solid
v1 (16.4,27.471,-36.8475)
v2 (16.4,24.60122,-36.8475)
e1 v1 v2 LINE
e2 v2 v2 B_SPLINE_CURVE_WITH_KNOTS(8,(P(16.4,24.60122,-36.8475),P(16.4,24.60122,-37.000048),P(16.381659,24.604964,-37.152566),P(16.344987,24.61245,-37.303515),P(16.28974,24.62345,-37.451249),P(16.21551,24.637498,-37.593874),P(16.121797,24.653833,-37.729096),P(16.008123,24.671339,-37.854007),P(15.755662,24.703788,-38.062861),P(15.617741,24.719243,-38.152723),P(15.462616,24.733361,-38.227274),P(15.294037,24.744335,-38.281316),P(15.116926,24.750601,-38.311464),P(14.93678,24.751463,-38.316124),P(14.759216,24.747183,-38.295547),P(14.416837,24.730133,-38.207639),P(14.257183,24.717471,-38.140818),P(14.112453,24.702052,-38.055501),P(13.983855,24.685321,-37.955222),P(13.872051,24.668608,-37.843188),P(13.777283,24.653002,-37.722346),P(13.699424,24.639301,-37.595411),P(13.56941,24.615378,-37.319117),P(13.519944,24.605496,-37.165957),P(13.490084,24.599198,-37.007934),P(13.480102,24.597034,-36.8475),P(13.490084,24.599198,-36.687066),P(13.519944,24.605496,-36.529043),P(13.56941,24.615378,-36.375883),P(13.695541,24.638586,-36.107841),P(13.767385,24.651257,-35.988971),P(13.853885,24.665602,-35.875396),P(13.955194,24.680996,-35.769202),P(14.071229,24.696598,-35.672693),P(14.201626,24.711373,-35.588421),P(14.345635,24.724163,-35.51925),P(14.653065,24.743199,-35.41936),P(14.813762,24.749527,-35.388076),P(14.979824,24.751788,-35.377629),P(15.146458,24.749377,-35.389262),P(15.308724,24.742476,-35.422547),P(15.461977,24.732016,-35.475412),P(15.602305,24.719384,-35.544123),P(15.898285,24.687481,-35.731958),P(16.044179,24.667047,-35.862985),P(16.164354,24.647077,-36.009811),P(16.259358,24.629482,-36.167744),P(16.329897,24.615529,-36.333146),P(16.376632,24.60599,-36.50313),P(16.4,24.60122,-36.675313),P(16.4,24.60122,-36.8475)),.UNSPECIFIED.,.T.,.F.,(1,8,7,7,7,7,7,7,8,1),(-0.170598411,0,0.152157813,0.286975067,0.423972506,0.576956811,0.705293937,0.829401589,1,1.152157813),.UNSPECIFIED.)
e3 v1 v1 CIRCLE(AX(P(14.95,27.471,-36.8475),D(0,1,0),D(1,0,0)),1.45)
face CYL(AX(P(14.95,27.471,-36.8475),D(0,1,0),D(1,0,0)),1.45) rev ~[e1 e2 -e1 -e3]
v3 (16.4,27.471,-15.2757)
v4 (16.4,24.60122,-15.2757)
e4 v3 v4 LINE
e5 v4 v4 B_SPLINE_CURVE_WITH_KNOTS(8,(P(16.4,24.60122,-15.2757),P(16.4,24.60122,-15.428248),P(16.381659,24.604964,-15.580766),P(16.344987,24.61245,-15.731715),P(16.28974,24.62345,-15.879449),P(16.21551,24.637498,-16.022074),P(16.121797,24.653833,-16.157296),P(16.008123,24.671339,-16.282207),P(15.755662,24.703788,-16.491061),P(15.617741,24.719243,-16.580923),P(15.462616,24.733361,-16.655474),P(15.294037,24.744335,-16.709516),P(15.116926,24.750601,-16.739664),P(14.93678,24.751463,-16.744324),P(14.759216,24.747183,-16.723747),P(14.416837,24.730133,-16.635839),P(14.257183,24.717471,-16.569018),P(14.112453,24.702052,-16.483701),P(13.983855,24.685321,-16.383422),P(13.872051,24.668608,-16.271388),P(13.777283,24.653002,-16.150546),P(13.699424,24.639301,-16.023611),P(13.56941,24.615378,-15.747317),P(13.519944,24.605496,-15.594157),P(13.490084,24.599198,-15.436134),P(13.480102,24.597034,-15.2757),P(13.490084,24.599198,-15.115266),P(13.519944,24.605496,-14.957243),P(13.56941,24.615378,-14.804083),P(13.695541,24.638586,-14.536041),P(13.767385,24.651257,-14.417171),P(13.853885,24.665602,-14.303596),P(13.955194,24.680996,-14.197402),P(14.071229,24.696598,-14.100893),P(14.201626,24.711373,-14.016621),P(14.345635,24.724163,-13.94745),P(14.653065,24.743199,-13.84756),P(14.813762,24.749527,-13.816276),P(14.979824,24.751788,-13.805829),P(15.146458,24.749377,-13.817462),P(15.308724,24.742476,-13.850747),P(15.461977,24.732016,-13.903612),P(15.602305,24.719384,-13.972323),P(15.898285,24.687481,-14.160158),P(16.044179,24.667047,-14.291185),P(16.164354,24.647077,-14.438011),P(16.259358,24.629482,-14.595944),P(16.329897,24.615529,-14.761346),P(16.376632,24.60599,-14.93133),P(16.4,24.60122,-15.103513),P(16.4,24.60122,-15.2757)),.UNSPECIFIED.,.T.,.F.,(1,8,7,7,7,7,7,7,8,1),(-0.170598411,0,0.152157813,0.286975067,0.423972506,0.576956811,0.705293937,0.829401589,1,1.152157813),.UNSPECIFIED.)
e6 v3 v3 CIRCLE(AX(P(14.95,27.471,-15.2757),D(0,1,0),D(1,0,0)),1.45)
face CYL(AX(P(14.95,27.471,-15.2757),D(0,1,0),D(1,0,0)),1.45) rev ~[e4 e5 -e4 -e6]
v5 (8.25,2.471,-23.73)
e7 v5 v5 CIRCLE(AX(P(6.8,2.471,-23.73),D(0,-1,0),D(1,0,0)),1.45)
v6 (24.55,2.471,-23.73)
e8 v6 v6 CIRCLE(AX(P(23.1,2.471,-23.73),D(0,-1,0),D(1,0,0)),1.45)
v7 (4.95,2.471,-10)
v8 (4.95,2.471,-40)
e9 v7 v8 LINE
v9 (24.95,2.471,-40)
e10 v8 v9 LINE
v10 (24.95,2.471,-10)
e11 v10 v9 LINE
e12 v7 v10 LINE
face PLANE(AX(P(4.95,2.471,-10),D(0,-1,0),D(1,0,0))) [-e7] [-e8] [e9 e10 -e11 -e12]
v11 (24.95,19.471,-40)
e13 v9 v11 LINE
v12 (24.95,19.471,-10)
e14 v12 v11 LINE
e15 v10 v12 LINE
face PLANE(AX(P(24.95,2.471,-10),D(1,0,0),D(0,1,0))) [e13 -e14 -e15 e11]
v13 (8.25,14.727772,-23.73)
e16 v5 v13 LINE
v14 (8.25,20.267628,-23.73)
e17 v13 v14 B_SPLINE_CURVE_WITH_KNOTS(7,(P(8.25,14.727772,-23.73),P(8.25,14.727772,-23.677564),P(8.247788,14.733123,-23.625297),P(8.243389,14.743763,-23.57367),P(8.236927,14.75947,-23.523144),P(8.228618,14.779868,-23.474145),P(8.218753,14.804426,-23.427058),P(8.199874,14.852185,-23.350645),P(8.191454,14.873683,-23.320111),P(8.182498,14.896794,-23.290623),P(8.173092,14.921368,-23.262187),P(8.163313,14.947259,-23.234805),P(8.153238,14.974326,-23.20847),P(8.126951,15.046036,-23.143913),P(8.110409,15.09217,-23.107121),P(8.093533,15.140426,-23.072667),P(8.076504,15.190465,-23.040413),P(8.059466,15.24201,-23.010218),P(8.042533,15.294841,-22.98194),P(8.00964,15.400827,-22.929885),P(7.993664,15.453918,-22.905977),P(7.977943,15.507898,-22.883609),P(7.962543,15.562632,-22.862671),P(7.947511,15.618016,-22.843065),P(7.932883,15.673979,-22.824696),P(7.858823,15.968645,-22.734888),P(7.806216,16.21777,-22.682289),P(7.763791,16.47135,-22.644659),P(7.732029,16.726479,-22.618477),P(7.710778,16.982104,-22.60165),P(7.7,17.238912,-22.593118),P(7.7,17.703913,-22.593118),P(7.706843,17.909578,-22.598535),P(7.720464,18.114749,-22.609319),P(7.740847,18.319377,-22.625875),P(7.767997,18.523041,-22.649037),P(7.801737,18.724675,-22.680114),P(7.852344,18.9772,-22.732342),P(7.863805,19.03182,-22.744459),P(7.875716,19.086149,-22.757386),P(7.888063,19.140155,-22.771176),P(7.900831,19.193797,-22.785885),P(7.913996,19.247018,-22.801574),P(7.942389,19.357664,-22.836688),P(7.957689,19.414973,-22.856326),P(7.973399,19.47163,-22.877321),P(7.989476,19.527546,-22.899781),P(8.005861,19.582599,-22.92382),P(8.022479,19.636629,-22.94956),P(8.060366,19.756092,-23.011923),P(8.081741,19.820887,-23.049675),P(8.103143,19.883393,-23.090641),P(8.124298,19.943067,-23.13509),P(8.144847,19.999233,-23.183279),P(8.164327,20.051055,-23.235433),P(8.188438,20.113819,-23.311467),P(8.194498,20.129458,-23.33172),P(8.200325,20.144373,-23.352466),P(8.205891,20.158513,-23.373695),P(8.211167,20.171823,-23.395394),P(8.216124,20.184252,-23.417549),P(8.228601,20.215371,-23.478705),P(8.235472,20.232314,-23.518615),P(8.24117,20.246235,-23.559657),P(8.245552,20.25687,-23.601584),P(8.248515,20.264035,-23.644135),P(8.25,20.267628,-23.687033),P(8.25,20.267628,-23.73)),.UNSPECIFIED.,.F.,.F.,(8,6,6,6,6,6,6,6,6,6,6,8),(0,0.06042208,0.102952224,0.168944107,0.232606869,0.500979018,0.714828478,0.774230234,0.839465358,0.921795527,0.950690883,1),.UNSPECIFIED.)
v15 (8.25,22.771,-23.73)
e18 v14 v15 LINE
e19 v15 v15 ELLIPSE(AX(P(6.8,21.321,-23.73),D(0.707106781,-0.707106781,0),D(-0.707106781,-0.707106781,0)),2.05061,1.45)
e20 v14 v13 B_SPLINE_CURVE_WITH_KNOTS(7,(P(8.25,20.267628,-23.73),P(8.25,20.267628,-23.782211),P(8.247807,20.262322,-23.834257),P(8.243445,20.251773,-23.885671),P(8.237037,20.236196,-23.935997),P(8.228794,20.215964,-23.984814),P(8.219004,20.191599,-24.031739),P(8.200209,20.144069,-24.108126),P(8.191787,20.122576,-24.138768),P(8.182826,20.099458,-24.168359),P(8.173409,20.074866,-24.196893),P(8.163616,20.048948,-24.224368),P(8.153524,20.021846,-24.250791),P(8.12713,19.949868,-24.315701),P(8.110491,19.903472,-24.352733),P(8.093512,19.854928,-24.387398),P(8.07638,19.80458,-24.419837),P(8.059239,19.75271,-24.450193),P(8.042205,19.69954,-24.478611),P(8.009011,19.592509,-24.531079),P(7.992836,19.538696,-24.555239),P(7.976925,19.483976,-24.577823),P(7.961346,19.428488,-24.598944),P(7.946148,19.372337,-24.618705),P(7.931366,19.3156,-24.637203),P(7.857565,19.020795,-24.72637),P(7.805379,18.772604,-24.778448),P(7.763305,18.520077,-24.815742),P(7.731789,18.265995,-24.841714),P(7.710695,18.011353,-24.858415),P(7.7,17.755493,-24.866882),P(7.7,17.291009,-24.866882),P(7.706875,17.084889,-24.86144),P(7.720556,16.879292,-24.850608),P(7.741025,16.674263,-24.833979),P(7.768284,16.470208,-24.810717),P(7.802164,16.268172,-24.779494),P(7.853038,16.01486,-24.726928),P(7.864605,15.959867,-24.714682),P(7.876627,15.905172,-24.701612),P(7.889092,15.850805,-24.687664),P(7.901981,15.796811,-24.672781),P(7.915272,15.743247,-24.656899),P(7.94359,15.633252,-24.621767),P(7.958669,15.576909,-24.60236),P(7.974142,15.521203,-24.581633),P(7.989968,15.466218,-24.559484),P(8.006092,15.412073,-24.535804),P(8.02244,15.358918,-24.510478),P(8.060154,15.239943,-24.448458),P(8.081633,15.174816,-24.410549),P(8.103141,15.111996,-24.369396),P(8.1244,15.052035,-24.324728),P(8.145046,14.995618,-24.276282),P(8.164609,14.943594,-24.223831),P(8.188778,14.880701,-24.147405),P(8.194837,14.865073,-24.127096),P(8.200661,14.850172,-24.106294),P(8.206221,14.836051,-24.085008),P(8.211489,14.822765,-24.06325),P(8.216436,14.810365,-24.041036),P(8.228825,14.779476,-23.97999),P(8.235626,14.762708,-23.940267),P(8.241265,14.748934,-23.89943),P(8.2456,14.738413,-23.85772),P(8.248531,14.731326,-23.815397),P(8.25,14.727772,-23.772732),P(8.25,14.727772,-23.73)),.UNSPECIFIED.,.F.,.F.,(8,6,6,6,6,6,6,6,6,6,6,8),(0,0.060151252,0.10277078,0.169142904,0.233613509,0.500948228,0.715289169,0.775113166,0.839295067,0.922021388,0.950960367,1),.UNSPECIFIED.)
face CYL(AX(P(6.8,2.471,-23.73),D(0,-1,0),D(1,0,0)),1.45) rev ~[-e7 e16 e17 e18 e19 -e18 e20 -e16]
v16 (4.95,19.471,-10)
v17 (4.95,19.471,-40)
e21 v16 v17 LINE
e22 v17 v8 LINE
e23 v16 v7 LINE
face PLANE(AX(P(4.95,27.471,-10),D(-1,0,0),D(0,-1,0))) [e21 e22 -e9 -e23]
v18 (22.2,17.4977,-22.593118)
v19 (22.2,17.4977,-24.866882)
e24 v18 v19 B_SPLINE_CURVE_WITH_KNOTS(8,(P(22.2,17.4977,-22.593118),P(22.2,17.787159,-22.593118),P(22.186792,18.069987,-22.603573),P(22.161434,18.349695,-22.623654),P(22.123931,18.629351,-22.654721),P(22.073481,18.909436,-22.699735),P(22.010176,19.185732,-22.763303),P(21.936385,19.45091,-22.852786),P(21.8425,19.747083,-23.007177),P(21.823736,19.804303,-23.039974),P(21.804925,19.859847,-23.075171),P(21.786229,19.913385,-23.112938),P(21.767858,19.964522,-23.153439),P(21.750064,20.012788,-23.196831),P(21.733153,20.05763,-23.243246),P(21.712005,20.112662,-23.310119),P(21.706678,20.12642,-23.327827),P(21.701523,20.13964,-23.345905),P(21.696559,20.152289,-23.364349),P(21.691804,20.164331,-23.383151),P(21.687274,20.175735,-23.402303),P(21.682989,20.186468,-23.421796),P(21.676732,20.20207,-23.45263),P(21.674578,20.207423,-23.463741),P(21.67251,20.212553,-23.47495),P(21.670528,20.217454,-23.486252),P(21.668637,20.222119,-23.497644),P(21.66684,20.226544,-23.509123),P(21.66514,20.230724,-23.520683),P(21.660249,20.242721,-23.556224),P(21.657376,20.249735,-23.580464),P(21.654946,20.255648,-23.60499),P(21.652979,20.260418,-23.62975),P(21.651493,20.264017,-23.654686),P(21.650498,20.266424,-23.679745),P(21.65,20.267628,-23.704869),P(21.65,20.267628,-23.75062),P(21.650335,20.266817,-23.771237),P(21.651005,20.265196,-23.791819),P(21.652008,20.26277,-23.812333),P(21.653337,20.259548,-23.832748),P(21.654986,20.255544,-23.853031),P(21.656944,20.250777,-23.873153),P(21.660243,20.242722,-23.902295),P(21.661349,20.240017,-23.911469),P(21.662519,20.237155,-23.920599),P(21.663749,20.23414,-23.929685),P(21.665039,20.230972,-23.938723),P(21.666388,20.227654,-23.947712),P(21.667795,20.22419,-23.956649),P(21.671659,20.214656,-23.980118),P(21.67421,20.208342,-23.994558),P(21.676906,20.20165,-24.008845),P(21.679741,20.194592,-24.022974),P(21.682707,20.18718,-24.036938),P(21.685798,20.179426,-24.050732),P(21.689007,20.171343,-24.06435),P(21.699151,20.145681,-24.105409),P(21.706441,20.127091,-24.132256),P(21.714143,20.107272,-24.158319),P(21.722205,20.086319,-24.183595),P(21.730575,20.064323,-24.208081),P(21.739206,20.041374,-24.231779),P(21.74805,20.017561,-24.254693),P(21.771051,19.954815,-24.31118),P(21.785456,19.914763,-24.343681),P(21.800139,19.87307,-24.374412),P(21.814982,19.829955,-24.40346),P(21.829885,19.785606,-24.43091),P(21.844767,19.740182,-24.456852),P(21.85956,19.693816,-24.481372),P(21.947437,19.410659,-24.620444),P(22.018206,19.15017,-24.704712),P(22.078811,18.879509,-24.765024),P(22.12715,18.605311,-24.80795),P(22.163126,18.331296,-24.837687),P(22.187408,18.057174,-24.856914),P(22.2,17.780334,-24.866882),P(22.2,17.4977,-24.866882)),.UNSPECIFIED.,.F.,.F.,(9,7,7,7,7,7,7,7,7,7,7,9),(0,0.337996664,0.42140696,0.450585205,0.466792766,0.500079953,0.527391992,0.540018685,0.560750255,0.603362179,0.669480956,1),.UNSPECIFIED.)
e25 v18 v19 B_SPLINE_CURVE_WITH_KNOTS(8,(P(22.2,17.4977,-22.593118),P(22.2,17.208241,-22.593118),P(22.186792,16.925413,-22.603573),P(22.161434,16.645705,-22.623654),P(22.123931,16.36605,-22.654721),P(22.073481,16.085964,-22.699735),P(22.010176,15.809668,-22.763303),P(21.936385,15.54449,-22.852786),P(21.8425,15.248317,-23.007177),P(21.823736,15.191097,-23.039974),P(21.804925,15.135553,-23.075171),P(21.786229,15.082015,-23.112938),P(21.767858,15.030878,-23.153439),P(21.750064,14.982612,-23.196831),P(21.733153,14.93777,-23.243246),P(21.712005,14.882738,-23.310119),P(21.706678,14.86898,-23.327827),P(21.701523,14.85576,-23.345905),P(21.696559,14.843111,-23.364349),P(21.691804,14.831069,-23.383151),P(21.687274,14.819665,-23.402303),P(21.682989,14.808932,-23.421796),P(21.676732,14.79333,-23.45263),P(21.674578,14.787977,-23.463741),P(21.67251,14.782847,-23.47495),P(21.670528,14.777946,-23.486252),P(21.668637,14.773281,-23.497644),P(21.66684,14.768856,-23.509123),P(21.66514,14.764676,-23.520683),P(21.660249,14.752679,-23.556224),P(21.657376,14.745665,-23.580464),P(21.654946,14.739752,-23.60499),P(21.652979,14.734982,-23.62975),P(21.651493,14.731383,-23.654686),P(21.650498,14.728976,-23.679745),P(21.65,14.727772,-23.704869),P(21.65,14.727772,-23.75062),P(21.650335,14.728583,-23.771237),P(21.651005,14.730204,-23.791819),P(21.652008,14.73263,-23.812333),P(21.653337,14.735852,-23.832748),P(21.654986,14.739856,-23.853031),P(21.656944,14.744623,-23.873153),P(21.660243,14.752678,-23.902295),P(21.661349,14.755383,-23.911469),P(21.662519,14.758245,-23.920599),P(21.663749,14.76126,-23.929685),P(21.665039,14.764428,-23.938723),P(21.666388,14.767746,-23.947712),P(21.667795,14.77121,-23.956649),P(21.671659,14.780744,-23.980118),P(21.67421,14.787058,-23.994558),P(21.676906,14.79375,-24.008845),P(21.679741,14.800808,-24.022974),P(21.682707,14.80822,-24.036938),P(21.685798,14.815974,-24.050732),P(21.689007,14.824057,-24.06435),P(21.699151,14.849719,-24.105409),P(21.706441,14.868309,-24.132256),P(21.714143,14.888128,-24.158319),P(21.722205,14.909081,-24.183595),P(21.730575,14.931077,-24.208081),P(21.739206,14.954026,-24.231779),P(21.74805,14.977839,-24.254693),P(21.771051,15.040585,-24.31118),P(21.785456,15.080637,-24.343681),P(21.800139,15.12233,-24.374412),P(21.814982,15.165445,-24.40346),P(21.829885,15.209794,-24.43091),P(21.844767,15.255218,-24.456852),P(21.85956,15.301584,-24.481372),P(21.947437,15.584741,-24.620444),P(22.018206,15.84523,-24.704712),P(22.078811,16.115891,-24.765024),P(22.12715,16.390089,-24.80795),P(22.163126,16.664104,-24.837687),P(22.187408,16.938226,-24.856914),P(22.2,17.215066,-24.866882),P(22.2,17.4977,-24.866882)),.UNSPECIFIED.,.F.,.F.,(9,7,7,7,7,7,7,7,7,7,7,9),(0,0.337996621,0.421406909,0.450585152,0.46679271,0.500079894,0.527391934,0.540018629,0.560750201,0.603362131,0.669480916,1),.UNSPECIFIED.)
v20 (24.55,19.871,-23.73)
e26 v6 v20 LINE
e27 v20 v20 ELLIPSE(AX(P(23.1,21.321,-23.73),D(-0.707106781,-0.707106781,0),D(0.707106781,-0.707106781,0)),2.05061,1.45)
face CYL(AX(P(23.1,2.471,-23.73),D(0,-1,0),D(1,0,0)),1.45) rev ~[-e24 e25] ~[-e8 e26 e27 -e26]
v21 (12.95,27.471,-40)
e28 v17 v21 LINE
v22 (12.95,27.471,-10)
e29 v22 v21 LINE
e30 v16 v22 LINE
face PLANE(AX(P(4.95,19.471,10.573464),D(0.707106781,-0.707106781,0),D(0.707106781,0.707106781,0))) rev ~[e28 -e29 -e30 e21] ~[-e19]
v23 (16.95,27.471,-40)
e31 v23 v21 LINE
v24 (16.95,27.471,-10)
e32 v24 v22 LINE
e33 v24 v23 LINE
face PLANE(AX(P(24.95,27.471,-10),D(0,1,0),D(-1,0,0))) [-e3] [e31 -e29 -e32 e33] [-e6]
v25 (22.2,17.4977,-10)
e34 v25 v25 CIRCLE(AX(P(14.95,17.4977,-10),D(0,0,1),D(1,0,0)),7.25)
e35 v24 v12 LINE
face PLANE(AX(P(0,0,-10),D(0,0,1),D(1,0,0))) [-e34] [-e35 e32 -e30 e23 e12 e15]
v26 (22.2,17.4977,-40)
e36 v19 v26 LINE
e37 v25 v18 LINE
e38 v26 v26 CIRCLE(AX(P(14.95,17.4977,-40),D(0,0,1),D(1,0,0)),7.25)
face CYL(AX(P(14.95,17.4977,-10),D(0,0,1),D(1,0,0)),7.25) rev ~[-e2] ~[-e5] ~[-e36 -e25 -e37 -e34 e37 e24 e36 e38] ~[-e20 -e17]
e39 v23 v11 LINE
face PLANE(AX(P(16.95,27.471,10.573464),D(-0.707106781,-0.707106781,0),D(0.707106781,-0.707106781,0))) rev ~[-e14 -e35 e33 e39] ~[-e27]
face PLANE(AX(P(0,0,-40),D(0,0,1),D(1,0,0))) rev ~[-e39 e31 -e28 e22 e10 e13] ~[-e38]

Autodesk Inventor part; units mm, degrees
ref_plane "YZ Plane" through (0, 0, 0) normal (1, 0, 0) x (0, 1, 0)
ref_plane "XZ Plane" through (0, 0, 0) normal (0, 1, 0) x (-1, 0, 0)
ref_plane "XY Plane" through (0, 0, 0) normal (0, 0, 1) x (1, 0, 0)
ref_plane "Work Plane1" through (0, 0, 0) normal (0, 0, 1) x (1, 0, 0)
ref_plane "Work Plane2" through (0, 0, -10) normal (0, 0, 1) x (1, 0, 0)
sketch "Sketch1" plane through (0, 0, -10) normal (0, 0, 1) x (1, 0, 0)
  circle A0 centre (14.95, 17.4977) radius 7.15 projected
  line L0 (0, 2.471) -> (29.9, 2.471) projected
  line L1 (0, 2.471) -> (0, 18.471) projected
  line L2 (0, 18.471) -> (-2, 18.471) projected
  line L3 (-2, 18.471) -> (-2, -1.5) projected
  line L4 (29.9, -1.5) -> (-2, -1.5) projected
  line L5 (29.9, -1.5) -> (29.9, 2.471) projected
  line L6 (4.95, 2.471) -> (24.95, 2.471)
  line L7 (24.95, 2.471) -> (24.95, 27.471)
  line L8 (24.95, 27.471) -> (4.95, 27.471)
  line L9 (4.95, 27.471) -> (4.95, 2.471)
  circle A1 centre (14.95, 17.4977) radius 7.25
  point P0 (0, 0)
  dimension "d6" = 20
  dimension "d7" = 25
  dimension "d8" = 10
  dimension "d9" = 0.1
extrude "Extrusion1" add sketch "Sketch1" against normal blind 30 contours L9 L8 L7 L0
sketch "Sketch2" plane through (4.95, 2.471, -10) normal (0, -1, 0) x (1, 0, 0)
  circle A0 centre (18.15, -13.73) radius 2.45 projected
  circle A1 centre (1.85, -13.73) radius 2.75 projected
  circle A2 centre (18.15, -13.73) radius 1.45
  circle A3 centre (1.85, -13.73) radius 1.45
  point P0 (-4.95, 10)
  dimension "d10" = 2.9
  dimension "d11" = 2.9
extrude "Extrusion2" cut sketch "Sketch2" against normal through all contours A2 | A3
chamfer "Chamfer1" distance 8 angle 45 2 edges at (24.95, 27.471, -25) (4.95, 27.471, -25)
sketch "Sketch3" plane through (12.95, 27.471, -10) normal (0, 1, 0) x (1, 0, 0)
  line L0 (0, 0) -> (0, 30) projected
  line L1 (4, 0) -> (0, 0) projected
  line L2 (4, 30) -> (4, 0) projected
  line L3 (0, 30) -> (4, 30) projected
  circle A0 centre (2, 5.2757) radius 1.45
  circle A1 centre (2, 26.8475) radius 1.45
  point P0 (-12.95, -10)
  dimension "d17" = 2.9
  dimension "d18" = 2.9
extrude "Extrusion3" cut sketch "Sketch3" against normal blind 10 contours A0 | A1
ref_plane "Work Plane3" through (0, 27.471, -10) normal (0, -0.7071068, 0.7071068) x (1, 0, 0)
ref_plane "Work Plane4" through (12.95, 27.471, -10) normal (0, 0.7071068, 0.7071068) x (1, 0, 0)
ref_plane "Work Plane5" through (14.95, 2.471, -10) normal (1, 0, 0) x (0, 0, -1)
sketch "Sketch5" plane through (14.95, 2.471, -10) normal (1, 0, 0) x (0, 0, -1)
  line L0 (0, 22.2768) -> (30, 22.2768) projected
  line L1 (0, 7.7768) -> (30, 7.7768) projected
  line L2 (0, 22.2768) -> (-4.2183, 22.2768)
  line L3 (-4.2183, 22.2768) -> (24.7731, 51.2681)
  line L4 (24.7731, 51.2681) -> (24.7731, 22.2768)
  point P0 (-10, -2.471)
  dimension "d21" = 41
  dimension "d22" = 45
properties part number "30_CUBE_openSIM_Laserpointer_Adapter"
